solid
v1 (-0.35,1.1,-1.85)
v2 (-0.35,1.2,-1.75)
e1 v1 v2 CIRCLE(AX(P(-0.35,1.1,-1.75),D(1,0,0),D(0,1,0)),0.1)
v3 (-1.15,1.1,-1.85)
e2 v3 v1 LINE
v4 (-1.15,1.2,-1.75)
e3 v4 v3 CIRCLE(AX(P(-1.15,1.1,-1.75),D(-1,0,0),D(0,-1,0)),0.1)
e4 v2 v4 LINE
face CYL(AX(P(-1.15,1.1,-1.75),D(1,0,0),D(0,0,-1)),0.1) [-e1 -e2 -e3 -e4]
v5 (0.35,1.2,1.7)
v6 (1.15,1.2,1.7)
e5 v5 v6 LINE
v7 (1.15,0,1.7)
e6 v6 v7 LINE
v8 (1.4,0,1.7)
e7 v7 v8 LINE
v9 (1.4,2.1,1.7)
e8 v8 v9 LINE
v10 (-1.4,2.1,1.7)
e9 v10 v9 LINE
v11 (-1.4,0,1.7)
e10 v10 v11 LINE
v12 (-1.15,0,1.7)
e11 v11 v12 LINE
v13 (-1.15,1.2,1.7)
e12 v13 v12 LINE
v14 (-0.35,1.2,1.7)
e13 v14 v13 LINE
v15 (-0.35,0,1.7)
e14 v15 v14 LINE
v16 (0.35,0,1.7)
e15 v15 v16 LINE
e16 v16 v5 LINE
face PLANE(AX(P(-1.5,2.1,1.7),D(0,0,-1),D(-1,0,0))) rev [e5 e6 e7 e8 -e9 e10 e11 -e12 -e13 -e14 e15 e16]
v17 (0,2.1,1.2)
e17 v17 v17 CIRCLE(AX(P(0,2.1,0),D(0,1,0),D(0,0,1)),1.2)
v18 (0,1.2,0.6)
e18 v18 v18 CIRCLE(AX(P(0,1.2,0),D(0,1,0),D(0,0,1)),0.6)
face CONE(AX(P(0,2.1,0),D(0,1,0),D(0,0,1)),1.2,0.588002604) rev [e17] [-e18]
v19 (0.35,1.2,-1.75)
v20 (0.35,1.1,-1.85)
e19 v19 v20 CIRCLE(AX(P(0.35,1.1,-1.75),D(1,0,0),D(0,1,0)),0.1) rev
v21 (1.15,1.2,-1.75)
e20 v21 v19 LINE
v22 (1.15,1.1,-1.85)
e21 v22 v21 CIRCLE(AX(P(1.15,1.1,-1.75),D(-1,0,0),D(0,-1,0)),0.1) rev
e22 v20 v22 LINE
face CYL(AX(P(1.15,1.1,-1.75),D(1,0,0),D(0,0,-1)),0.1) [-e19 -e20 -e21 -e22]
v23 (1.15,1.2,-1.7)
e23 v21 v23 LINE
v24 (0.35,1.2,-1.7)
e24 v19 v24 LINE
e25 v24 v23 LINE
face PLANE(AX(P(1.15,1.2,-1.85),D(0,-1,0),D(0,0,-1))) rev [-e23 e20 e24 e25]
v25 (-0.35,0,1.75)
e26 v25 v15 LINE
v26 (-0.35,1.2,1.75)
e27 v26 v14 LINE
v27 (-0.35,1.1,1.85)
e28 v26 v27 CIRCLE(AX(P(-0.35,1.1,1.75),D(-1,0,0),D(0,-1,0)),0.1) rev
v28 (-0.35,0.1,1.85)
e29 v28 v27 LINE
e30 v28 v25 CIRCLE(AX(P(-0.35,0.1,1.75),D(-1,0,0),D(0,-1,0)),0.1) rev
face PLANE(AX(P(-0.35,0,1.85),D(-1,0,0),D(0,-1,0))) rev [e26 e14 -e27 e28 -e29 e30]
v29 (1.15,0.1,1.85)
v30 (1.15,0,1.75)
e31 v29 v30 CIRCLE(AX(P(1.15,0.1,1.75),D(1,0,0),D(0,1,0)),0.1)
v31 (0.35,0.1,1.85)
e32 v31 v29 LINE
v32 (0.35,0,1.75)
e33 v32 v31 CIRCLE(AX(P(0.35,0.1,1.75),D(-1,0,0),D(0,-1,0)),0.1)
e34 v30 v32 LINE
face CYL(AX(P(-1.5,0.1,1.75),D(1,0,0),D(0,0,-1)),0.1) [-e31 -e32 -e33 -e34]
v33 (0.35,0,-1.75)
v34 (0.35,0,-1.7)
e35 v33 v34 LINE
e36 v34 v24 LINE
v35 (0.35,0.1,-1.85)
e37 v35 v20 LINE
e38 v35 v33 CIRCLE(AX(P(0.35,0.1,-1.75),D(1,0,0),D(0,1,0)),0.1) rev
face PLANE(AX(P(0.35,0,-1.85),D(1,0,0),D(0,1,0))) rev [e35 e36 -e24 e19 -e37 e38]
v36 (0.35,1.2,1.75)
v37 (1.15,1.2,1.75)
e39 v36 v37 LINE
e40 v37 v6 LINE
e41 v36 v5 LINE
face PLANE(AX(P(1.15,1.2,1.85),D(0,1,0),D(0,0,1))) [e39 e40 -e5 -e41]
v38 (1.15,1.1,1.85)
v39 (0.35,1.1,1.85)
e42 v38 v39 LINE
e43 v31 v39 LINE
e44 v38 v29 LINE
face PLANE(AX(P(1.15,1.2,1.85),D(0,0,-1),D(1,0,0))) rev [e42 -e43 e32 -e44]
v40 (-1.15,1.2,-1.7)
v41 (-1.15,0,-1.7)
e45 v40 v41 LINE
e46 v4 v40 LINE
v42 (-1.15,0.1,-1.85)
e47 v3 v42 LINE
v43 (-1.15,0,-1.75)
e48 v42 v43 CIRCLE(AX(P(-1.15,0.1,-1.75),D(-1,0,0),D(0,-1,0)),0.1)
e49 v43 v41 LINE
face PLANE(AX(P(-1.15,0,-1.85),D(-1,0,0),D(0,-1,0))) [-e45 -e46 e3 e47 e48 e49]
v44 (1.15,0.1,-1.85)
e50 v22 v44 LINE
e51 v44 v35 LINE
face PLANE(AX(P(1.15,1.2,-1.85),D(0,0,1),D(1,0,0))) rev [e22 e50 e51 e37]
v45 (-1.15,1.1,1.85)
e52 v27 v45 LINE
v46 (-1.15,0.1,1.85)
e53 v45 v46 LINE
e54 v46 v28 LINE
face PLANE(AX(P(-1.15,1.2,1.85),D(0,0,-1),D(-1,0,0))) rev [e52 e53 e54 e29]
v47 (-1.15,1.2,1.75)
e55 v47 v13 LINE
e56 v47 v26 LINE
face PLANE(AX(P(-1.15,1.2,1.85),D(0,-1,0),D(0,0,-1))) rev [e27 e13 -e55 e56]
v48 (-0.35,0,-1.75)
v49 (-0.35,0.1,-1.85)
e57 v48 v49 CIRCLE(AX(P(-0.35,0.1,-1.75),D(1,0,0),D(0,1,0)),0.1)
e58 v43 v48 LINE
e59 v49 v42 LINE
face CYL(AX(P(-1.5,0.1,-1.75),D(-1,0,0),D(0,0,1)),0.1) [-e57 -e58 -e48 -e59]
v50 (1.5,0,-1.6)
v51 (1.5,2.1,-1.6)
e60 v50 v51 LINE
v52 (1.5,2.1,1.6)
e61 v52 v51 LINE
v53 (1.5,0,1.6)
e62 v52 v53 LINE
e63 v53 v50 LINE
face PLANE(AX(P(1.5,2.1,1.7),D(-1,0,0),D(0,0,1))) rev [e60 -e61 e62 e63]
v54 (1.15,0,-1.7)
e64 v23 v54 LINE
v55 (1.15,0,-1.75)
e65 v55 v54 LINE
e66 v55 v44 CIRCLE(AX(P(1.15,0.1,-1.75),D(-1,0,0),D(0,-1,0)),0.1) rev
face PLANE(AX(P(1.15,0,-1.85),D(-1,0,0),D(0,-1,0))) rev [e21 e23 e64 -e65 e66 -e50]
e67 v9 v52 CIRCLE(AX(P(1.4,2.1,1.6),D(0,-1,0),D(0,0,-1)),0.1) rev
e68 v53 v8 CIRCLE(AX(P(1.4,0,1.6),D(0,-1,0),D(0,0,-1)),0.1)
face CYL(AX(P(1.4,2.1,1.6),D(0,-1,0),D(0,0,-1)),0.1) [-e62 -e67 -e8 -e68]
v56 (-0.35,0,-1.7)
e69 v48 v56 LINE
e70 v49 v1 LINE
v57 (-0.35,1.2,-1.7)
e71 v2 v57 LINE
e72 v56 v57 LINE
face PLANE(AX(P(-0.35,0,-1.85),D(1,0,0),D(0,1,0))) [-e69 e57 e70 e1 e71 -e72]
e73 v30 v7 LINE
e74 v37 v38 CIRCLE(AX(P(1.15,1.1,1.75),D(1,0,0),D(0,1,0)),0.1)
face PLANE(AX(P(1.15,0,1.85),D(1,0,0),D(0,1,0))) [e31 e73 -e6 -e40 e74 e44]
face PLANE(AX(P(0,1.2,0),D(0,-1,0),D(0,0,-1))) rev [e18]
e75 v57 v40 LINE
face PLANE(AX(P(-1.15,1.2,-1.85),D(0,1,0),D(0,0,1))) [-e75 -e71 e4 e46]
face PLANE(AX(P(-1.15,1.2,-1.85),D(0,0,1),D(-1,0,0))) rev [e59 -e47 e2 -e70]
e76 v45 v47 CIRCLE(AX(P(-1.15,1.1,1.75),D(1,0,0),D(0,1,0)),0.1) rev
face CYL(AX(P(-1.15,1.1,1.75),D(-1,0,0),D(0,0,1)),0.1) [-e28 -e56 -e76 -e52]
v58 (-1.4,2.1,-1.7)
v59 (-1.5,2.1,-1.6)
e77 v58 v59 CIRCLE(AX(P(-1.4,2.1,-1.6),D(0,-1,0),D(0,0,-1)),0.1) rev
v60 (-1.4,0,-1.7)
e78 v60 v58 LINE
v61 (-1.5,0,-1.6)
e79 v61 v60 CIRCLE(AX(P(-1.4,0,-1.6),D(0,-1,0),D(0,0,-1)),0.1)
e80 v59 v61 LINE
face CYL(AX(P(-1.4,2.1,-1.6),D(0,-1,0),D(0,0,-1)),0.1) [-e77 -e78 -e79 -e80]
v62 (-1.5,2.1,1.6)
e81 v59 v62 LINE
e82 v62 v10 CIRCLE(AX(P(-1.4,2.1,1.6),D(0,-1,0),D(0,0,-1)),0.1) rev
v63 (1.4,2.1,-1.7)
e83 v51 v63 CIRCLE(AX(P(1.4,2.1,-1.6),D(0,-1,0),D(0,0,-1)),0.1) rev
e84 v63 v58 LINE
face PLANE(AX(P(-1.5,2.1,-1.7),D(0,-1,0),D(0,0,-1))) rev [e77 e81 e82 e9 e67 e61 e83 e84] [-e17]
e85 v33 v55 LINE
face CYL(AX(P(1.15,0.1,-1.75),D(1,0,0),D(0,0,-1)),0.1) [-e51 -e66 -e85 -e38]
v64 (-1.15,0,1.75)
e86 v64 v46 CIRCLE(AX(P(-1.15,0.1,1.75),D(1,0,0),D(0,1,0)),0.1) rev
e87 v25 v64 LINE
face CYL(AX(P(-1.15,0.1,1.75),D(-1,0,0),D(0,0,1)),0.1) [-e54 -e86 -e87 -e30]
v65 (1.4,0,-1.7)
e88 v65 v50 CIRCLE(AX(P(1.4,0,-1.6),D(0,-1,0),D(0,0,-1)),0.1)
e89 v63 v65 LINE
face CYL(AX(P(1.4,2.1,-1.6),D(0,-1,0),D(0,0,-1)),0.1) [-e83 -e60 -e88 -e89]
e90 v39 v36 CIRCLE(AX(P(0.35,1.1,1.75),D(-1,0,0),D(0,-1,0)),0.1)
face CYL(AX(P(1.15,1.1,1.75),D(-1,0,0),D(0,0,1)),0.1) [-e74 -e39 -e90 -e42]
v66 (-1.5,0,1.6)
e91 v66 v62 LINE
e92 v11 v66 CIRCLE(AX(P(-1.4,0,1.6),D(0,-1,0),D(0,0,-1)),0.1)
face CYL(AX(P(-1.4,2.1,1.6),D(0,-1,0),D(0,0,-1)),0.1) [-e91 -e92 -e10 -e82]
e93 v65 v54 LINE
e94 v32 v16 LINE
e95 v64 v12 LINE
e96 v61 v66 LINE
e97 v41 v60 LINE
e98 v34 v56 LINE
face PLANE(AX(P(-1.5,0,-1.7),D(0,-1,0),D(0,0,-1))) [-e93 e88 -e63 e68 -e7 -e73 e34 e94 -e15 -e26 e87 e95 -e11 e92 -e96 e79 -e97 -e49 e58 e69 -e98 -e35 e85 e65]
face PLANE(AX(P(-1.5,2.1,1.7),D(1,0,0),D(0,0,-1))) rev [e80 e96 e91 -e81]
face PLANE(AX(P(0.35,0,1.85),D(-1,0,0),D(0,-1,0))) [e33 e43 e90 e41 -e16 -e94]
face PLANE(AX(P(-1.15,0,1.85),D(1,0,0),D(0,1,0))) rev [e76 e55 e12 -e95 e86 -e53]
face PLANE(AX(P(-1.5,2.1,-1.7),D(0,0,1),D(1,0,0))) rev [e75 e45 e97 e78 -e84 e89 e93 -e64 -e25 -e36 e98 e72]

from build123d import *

# Parameters (mm, degrees)
SKETCH1_W            = 3
SKETCH1_H            = 3.4
BOSS_EXTRUDE1_DEPTH  = 2.1
SKETCH2_W            = 0.8
SKETCH2_H            = 1.2
BOSS_EXTRUDE2_DEPTH  = 0.15
FILLET1_R            = 0.1
FILLET1_OF_MIRROR1_R = 0.1
MIRROR2_START        = -1.15
MIRROR2_DEPTH        = 0.8
MIRROR2_START_2      = 0.35
MIRROR2_2_DEPTH      = 0.8
FILLET2_R            = 0.1


# Read off the part's stored shape, not the designer's step: Mirror2
with BuildPart() as part:
    # Sketch1 → Boss-Extrude1 (new body)
    with BuildSketch(Plane(origin=(0, 0, 0), x_dir=(1, 0, 0), z_dir=(0, 1, 0))):
        Rectangle(SKETCH1_W, SKETCH1_H)
    extrude(amount=BOSS_EXTRUDE1_DEPTH)

    # Sketch2 → Boss-Extrude2 (add)
    with BuildSketch(Plane.XY.offset(1.7)):
        with Locations((-0.75, 0.6)):
            Rectangle(SKETCH2_W, SKETCH2_H)
    boss_extrude2 = extrude(amount=BOSS_EXTRUDE2_DEPTH)

    # Fillet1
    fillet1_edges = [part.edges().sort_by_distance(p)[0] for p in [
        (-0.75, 0, 1.85),
        (-0.75, 1.2, 1.85),
    ]]
    fillet(fillet1_edges, radius=FILLET1_R)

    # Mirror1: Boss-Extrude2 across plane
    add(boss_extrude2.mirror(Plane(origin=(0, 0, 0), x_dir=(0, 0, 1), z_dir=(1, 0, 0))))

    # Fillet1 of Mirror1
    fillet1_of_mirror1_edges = [part.edges().sort_by_distance(p)[0] for p in [
        (0.75, 0, 1.85),
        (0.75, 1.2, 1.85),
    ]]
    fillet(fillet1_of_mirror1_edges, radius=FILLET1_OF_MIRROR1_R)

    # Mirror2 outline → Mirror2 (add)
    with BuildSketch(Plane.YZ.offset(MIRROR2_START)):
        with BuildLine():
            Line((1.2, -1.75), (1.2, -1.7))
            Line((1.2, -1.7), (0, -1.7))
            Line((0, -1.7), (0, -1.75))
            ThreePointArc((0, -1.75), (0.029289322, -1.820710678), (0.1, -1.85))
            Line((0.1, -1.85), (1.1, -1.85))
            ThreePointArc((1.1, -1.85), (1.170710678, -1.820710678), (1.2, -1.75))
        make_face()
    extrude(amount=MIRROR2_DEPTH)

    # Mirror2 2 outline → Mirror2 2 (add)
    with BuildSketch(Plane.YZ.offset(MIRROR2_START_2)):
        with BuildLine():
            Line((1.2, -1.75), (1.2, -1.7))
            Line((1.2, -1.7), (0, -1.7))
            Line((0, -1.7), (0, -1.75))
            ThreePointArc((0, -1.75), (0.029289322, -1.820710678), (0.1, -1.85))
            Line((0.1, -1.85), (1.1, -1.85))
            ThreePointArc((1.1, -1.85), (1.170710678, -1.820710678), (1.2, -1.75))
        make_face()
    extrude(amount=MIRROR2_2_DEPTH)

    # Sketch11 → Cut-Revolve1 (revolve, cut)
    with BuildSketch(Plane(origin=(0, 0, 0), x_dir=(0, 0, -1), z_dir=(1, 0, 0))):
        Polygon((0, 2.1), (-1.2, 2.1), (-0.6, 1.2), (0, 1.2), align=None)
    revolve(axis=Axis((0, 2.1, 0), (0, -1, 0)), mode=Mode.SUBTRACT)

    # Fillet2
    fillet2_edges = [part.edges().sort_by_distance(p)[0] for p in [
        (-1.5, 1.05, -1.7),
        (1.5, 1.05, -1.7),
        (-1.5, 1.05, 1.7),
        (1.5, 1.05, 1.7),
    ]]
    fillet(fillet2_edges, radius=FILLET2_R)


solid = part.part
